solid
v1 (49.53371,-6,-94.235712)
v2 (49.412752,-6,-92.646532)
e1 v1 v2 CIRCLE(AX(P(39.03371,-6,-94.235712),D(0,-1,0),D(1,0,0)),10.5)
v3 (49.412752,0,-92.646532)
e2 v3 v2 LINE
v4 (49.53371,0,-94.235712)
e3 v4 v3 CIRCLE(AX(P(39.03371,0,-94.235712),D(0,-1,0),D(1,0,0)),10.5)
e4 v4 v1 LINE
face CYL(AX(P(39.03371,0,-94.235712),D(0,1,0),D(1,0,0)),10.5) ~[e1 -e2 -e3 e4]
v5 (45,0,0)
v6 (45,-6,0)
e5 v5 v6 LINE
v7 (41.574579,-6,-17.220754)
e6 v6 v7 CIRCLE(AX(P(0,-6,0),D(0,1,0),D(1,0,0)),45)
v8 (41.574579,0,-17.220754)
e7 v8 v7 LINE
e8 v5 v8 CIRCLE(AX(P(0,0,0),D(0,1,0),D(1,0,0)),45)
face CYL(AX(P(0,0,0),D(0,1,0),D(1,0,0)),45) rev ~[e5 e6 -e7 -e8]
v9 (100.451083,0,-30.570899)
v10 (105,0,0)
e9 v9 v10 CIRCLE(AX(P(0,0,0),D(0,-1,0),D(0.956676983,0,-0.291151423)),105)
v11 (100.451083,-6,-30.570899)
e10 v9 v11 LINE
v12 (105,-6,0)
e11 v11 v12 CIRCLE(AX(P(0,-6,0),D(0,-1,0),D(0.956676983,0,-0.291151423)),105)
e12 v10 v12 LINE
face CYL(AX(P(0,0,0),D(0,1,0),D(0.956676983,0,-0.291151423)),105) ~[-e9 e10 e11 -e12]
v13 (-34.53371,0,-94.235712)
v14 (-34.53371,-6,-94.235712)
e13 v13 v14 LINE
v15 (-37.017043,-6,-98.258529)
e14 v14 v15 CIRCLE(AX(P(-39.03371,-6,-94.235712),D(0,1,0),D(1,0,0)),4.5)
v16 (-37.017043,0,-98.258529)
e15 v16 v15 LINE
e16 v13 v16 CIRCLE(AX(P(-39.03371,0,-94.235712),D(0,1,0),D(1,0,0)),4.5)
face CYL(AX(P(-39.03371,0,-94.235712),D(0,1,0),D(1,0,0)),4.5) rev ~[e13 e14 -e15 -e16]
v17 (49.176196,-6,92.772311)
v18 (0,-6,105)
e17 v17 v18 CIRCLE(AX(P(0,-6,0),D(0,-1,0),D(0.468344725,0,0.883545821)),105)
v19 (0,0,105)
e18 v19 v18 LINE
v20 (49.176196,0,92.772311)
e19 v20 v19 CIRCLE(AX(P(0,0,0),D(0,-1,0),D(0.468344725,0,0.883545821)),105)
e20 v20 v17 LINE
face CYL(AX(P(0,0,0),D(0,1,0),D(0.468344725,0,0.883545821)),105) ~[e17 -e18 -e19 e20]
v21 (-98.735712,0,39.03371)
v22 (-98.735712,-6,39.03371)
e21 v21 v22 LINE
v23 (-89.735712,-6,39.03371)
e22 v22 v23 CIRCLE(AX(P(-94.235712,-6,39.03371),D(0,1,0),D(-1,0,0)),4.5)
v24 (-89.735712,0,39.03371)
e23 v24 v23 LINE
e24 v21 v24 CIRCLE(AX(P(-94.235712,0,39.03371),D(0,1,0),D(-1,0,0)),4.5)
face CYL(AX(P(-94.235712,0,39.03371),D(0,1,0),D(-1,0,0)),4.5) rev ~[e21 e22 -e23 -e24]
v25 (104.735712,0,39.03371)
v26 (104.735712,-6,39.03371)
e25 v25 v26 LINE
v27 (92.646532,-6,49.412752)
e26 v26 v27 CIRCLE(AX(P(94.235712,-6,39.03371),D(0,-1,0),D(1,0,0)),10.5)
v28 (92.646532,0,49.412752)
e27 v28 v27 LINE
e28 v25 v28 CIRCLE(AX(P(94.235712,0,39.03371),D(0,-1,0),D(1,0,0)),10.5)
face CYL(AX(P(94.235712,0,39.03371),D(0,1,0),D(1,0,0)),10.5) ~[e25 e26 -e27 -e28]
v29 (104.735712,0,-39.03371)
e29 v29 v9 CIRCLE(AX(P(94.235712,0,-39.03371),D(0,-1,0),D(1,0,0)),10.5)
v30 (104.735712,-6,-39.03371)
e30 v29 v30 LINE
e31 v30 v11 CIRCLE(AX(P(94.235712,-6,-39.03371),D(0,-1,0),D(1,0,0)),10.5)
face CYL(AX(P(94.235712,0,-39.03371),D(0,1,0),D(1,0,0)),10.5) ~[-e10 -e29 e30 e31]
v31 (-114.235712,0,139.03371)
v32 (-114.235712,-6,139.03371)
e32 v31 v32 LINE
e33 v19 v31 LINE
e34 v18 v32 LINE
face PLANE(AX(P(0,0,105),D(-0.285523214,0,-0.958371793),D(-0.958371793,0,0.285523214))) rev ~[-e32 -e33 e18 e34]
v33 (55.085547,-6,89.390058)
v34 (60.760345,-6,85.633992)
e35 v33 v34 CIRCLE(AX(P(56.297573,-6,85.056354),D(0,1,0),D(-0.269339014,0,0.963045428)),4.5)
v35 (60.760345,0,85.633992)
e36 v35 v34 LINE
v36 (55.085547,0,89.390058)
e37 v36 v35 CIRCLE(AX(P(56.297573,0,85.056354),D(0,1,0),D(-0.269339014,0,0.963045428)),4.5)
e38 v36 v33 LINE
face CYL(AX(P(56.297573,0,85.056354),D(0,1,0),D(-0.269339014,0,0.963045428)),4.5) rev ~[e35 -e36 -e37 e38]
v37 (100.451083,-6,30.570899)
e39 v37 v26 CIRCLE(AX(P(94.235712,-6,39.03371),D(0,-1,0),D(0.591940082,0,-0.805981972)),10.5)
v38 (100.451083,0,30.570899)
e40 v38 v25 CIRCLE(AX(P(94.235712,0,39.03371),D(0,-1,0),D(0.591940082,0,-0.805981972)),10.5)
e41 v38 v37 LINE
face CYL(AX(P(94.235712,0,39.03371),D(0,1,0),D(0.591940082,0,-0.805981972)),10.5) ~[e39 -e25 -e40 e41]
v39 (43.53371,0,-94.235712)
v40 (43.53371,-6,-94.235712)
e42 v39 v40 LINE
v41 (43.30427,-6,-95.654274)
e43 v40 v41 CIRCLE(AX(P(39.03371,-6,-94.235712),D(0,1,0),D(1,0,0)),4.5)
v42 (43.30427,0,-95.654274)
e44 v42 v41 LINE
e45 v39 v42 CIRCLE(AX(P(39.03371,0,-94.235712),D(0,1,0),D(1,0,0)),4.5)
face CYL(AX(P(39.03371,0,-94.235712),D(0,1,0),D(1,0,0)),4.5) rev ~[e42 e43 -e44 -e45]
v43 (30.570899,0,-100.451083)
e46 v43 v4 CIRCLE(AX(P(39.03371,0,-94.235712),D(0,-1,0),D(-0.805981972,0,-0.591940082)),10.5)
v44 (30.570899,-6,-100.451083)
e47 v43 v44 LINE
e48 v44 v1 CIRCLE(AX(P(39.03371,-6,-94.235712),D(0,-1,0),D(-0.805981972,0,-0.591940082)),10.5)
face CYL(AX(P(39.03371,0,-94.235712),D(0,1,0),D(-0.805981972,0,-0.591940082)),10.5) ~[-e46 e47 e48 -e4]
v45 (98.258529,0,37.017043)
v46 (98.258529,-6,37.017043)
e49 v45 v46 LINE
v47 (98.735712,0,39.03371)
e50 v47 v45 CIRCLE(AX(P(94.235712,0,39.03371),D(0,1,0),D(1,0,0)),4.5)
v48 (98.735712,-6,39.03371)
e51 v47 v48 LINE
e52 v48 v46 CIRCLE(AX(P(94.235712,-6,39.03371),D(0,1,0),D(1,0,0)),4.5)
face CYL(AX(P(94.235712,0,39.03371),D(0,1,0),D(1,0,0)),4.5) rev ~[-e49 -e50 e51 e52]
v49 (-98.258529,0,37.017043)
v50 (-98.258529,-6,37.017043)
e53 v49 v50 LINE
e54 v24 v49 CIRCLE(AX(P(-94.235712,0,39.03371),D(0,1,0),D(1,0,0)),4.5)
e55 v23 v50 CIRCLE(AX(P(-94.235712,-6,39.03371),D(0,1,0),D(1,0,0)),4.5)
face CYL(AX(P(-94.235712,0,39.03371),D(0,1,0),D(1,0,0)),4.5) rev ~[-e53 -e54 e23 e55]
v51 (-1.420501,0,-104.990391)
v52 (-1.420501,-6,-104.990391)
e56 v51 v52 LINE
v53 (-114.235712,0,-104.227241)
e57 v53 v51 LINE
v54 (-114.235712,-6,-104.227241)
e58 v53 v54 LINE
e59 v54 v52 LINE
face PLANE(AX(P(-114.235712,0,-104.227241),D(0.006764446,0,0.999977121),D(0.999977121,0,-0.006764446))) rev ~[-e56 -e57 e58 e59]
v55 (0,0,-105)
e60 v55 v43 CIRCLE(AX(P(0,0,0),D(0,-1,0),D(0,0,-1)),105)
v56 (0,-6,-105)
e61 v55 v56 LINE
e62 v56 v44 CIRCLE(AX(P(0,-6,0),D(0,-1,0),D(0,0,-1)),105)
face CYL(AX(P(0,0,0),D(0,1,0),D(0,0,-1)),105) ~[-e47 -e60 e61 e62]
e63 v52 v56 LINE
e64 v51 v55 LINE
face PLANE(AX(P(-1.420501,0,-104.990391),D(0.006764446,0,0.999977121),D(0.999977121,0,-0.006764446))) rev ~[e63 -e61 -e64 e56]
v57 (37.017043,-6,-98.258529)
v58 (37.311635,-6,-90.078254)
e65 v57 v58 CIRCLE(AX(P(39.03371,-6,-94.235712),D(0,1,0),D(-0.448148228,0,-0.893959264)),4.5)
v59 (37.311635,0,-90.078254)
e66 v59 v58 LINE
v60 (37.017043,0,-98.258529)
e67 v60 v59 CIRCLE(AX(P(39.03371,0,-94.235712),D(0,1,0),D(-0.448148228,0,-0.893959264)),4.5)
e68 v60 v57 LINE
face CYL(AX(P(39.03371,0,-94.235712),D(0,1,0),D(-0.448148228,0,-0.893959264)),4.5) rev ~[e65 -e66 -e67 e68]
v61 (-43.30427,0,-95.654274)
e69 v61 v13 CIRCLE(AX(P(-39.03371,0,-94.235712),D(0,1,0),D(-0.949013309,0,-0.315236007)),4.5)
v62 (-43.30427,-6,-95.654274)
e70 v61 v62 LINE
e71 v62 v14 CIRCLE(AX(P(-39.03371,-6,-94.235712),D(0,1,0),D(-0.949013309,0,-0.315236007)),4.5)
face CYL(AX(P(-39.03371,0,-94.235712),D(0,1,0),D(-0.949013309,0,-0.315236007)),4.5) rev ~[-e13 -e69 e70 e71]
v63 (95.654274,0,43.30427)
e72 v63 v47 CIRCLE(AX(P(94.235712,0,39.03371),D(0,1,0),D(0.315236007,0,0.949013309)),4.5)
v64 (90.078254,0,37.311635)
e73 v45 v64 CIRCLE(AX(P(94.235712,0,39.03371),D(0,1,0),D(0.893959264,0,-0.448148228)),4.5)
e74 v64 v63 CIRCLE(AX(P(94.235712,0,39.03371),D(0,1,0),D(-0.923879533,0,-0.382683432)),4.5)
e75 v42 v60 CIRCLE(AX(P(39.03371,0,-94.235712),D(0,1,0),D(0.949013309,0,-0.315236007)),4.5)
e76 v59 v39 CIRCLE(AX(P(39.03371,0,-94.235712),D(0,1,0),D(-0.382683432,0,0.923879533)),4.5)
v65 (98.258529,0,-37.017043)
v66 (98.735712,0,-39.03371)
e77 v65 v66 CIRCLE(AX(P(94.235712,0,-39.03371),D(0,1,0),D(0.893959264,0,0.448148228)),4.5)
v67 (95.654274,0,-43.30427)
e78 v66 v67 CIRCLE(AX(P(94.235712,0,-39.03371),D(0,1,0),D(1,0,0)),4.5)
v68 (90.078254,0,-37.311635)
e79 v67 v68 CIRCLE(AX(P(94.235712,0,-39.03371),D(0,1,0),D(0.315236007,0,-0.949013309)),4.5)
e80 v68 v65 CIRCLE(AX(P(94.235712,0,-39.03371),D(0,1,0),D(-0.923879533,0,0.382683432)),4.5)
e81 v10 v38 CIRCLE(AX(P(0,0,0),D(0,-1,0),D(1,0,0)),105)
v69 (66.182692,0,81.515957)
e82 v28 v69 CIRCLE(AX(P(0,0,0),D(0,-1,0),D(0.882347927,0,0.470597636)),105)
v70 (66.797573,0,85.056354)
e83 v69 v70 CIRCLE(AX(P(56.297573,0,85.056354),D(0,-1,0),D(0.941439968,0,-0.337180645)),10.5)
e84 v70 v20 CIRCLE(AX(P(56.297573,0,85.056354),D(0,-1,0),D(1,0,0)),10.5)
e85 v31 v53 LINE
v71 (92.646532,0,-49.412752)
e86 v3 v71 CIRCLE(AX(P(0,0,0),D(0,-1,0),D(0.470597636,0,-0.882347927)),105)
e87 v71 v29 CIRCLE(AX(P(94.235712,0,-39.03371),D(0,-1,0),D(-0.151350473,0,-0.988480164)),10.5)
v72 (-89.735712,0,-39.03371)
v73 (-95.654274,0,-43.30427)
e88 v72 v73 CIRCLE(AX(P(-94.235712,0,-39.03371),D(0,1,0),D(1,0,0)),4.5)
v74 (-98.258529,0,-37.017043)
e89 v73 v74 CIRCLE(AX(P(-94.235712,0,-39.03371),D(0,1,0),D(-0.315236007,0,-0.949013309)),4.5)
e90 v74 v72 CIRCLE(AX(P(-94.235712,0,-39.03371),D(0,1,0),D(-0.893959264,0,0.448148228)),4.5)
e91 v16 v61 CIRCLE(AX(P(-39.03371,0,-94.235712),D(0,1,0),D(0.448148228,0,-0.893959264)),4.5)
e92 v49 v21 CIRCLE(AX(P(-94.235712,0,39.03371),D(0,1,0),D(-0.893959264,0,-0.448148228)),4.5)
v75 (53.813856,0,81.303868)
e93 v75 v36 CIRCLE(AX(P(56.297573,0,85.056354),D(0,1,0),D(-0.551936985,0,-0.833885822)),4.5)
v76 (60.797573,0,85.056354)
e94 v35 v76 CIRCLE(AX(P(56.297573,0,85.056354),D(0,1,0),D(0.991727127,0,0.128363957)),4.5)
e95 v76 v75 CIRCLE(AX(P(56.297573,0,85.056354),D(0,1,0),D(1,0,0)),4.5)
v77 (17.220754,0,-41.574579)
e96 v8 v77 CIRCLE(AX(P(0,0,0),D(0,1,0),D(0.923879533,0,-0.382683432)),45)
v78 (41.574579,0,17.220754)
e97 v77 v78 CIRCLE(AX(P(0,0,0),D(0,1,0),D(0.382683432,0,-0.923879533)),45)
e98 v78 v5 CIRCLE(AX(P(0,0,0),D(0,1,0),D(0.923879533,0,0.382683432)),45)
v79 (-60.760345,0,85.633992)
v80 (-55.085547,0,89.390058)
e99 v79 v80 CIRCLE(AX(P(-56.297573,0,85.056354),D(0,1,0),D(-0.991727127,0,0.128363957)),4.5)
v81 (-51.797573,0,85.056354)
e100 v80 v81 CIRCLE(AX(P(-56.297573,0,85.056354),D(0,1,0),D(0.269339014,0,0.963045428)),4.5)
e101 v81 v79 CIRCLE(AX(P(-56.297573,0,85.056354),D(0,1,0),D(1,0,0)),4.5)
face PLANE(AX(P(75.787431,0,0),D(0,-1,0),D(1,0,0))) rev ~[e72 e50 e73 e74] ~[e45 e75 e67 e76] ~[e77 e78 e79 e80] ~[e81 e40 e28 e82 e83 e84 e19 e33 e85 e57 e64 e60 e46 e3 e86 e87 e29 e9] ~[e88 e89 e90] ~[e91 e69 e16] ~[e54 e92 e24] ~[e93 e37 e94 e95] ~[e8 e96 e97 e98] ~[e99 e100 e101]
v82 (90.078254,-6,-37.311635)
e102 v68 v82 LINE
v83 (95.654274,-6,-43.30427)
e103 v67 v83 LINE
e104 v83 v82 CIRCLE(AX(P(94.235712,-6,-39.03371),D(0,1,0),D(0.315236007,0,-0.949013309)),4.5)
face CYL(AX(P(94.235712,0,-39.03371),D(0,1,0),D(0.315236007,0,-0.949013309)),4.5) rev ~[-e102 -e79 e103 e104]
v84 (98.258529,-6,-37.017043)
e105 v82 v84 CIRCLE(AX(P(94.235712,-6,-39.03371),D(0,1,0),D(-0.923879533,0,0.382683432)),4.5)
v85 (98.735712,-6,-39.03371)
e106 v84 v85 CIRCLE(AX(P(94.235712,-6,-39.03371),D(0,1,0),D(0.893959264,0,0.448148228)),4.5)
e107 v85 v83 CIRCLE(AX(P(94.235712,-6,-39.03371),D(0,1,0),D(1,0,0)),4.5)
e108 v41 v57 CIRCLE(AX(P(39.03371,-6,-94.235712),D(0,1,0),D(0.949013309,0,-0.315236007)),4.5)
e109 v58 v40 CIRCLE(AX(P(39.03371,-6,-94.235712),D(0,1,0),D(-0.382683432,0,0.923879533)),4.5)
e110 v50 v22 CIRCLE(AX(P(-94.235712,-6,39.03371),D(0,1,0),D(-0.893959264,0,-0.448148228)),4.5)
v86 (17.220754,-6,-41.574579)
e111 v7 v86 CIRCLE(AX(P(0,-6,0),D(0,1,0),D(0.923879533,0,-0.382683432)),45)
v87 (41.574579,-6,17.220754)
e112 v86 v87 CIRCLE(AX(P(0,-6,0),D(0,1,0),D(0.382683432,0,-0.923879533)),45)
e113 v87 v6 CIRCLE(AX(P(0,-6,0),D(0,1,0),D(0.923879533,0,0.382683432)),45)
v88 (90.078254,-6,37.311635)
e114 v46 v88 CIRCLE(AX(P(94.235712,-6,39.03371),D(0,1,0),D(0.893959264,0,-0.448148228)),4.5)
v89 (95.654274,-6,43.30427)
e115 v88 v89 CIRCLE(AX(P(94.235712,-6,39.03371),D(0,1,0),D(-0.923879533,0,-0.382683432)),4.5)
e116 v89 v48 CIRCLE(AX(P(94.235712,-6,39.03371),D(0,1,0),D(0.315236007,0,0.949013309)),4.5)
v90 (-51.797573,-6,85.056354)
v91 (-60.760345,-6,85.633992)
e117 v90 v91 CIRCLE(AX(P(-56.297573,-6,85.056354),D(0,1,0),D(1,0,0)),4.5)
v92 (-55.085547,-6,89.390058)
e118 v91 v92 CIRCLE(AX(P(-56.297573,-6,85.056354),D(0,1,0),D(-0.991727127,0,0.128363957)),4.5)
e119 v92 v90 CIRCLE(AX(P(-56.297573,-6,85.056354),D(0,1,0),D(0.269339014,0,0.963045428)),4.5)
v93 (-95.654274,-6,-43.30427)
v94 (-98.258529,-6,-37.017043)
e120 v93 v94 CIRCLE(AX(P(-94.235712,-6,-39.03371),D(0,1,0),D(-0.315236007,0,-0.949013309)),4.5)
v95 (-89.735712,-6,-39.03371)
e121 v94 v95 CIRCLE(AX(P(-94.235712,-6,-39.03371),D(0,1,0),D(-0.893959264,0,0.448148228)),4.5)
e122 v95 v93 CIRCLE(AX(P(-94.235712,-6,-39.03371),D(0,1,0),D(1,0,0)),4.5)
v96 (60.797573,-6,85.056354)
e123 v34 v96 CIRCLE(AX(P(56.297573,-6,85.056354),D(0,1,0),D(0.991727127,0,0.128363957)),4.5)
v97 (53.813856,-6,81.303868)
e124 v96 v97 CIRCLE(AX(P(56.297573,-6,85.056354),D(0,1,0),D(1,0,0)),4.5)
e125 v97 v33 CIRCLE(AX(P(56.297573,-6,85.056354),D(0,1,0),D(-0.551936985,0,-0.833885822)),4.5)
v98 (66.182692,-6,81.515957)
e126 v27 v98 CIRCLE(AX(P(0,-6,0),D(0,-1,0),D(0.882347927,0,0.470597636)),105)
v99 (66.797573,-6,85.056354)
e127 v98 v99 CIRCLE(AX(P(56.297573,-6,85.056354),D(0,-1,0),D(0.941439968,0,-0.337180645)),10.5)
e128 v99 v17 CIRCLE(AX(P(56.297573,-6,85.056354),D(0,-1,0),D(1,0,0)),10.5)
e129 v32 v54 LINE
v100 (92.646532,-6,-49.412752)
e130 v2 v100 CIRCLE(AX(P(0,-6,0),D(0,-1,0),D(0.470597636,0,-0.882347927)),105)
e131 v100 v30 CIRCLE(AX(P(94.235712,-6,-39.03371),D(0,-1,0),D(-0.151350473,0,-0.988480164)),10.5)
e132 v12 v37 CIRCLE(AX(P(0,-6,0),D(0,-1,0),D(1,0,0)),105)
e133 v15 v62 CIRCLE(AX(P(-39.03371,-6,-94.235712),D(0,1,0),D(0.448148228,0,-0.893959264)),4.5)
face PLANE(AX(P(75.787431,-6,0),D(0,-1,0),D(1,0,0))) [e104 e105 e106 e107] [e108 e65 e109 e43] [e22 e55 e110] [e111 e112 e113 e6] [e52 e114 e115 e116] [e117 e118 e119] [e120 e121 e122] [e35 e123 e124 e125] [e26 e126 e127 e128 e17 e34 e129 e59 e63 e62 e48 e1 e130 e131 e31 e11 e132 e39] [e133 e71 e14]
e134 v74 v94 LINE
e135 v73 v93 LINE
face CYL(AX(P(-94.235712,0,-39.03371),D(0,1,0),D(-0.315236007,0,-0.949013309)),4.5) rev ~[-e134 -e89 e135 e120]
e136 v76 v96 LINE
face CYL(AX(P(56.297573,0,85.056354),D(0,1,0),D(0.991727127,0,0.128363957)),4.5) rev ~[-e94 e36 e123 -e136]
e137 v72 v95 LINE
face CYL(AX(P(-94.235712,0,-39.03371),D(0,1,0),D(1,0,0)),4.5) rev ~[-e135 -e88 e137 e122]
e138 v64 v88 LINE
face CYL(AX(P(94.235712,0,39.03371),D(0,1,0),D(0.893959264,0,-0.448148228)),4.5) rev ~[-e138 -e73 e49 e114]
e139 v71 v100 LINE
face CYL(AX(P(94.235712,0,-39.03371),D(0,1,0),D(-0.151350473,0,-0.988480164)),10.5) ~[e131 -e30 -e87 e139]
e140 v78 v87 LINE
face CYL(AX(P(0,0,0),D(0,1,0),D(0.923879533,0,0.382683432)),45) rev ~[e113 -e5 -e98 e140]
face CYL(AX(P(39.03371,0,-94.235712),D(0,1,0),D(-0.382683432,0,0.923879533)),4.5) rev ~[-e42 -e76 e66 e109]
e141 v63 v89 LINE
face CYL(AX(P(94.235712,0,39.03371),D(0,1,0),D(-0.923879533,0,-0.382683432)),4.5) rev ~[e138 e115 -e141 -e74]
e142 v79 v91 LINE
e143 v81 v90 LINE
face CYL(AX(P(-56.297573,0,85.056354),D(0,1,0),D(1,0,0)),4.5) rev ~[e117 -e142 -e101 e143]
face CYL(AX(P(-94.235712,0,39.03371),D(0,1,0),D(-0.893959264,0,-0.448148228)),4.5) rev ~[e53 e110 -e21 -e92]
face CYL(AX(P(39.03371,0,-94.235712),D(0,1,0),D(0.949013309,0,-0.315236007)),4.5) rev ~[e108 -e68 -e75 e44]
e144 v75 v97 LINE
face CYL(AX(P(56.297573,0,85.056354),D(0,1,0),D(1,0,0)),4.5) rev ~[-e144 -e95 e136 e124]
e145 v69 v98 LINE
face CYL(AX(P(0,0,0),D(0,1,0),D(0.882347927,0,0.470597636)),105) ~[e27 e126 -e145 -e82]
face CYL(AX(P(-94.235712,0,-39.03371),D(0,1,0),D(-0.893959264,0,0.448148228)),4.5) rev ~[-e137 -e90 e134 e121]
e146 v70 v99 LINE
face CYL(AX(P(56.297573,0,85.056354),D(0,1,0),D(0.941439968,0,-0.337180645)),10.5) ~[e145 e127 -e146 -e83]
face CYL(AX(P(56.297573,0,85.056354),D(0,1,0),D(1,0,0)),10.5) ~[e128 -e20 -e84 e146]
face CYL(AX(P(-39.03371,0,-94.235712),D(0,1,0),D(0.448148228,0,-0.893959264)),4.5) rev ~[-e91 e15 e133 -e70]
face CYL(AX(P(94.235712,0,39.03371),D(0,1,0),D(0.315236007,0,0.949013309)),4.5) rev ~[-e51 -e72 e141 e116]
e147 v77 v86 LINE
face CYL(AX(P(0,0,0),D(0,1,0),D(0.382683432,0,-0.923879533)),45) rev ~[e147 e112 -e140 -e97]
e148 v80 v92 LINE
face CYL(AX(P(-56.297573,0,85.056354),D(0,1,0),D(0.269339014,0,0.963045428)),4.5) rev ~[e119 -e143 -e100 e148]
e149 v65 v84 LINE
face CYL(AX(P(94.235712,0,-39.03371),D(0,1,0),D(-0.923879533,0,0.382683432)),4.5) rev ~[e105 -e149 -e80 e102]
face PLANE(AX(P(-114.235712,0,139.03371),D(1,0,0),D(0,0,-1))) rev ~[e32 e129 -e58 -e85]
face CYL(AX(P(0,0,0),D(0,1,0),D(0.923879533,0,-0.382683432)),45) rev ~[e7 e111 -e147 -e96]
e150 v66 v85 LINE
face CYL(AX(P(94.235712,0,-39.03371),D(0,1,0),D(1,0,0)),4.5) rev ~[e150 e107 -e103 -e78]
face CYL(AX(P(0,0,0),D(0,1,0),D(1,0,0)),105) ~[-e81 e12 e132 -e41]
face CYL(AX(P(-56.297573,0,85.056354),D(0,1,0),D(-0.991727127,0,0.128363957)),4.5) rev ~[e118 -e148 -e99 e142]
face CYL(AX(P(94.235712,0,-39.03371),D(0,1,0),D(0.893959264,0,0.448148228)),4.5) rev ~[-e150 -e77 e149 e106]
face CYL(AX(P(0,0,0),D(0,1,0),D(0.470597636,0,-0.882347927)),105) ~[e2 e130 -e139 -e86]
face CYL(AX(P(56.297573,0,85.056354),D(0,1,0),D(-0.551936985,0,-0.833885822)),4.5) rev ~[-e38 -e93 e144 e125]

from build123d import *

# Parameters (mm, degrees)
F1_DEPTH = 6


with BuildPart() as f1:
    # F0 (on Front) → F1 (new body)
    with BuildSketch(Plane.XZ):
        with BuildLine():
            ThreePointArc((100.4510831721, -30.5708993907), (103.8565446495, -15.4537417302), (105, 0))
            ThreePointArc((105, 0), (103.8565446495, 15.4537417302), (100.4510831721, 30.5708993907))
            ThreePointArc((100.4510831721, 30.5708993907), (91.4115955865, 28.9206312082), (84.5349772248, 35.0155340614))
            Line((84.5349772248, 35.0155340614), (41.574578963, 17.2207544564))
            ThreePointArc((41.574578963, 17.2207544564), (44.1353376181, 8.7790644907), (45, 0))
            ThreePointArc((45, 0), (44.1353376181, -8.7790644907), (41.574578963, -17.2207544564))
            Line((41.574578963, -17.2207544564), (84.5349772248, -35.0155340614))
            ThreePointArc((84.5349772248, -35.0155340614), (91.4115955865, -28.9206312082), (100.4510831721, -30.5708993907))
        make_face()
        with BuildLine():
            ThreePointArc((84.5349772248, 35.0155340614), (91.4115955865, 28.9206312082), (100.4510831721, 30.5708993907))
            ThreePointArc((100.4510831721, 30.5708993907), (99.407070598, 33.8117481819), (98.2585290039, 37.0170430746))
            ThreePointArc((98.2585290039, 37.0170430746), (94.0737613555, 34.5366252803), (90.0782544199, 37.3116346556))
            Line((90.0782544199, 37.3116346556), (84.5349772248, 35.0155340614))
        make_face()
        with BuildLine():
            ThreePointArc((98.2585290039, 37.0170430746), (99.407070598, 33.8117481819), (100.4510831721, 30.5708993907))
            ThreePointArc((100.4510831721, 30.5708993907), (103.6035133918, 34.2908941649), (104.7357123162, 39.0337101012))
            ThreePointArc((104.7357123162, 39.0337101012), (101.075434913, 47.0004029407), (92.6465323546, 49.4127518224))
            ThreePointArc((92.6465323546, 49.4127518224), (94.199930141, 46.3828972946), (95.6542743456, 43.3042699906))
            ThreePointArc((95.6542743456, 43.3042699906), (97.8849265557, 41.6668138656), (98.7357123162, 39.0337101012))
            ThreePointArc((98.7357123162, 39.0337101012), (98.6147918481, 37.997533257), (98.2585290039, 37.0170430746))
        make_face()
        with BuildLine():
            ThreePointArc((104.7357123162, -39.0337101012), (103.6035133918, -34.2908941649), (100.4510831721, -30.5708993907))
            ThreePointArc((100.4510831721, -30.5708993907), (99.407070598, -33.8117481819), (98.2585290039, -37.0170430746))
            ThreePointArc((98.2585290039, -37.0170430746), (98.6147918481, -37.997533257), (98.7357123162, -39.0337101012))
            ThreePointArc((98.7357123162, -39.0337101012), (97.8849265557, -41.6668138656), (95.6542743456, -43.3042699906))
            ThreePointArc((95.6542743456, -43.3042699906), (94.199930141, -46.3828972946), (92.6465323546, -49.4127518224))
            ThreePointArc((92.6465323546, -49.4127518224), (101.075434913, -47.0004029407), (104.7357123162, -39.0337101012))
        make_face()
        with BuildLine():
            ThreePointArc((98.2585290039, -37.0170430746), (99.407070598, -33.8117481819), (100.4510831721, -30.5708993907))
            ThreePointArc((100.4510831721, -30.5708993907), (91.4115955865, -28.9206312082), (84.5349772248, -35.0155340614))
            Line((84.5349772248, -35.0155340614), (90.0782544199, -37.3116346556))
            ThreePointArc((90.0782544199, -37.3116346556), (94.0737613555, -34.5366252803), (98.2585290039, -37.0170430746))
        make_face()
        with BuildLine():
            ThreePointArc((92.6465323546, 49.4127518224), (85.0877335618, 44.1877846748), (84.5349772248, 35.0155340614))
            Line((84.5349772248, 35.0155340614), (90.0782544199, 37.3116346556))
            ThreePointArc((90.0782544199, 37.3116346556), (90.9412765212, 42.0991126512), (95.6542743456, 43.3042699906))
            ThreePointArc((95.6542743456, 43.3042699906), (94.199930141, 46.3828972946), (92.6465323546, 49.4127518224))
        make_face()
        with BuildLine():
            Line((41.574578963, 17.2207544564), (84.5349772248, 35.0155340614))
            ThreePointArc((84.5349772248, 35.0155340614), (85.0877335618, 44.1877846748), (92.6465323546, 49.4127518224))
            ThreePointArc((92.6465323546, 49.4127518224), (81.0205812557, 66.7882131292), (66.1826921615, 81.5159570774))
            ThreePointArc((66.1826921615, 81.5159570774), (59.6114355729, 75.0930054405), (50.5022341561, 76.3005527191))
            Line((50.5022341561, 76.3005527191), (24.837164339, 37.524861993))
            ThreePointArc((24.837164339, 37.524861993), (34.7231062524, 28.6235199125), (41.574578963, 17.2207544564))
        make_face()
        with BuildLine():
            ThreePointArc((92.6465323546, -49.4127518224), (85.0877335618, -44.1877846748), (84.5349772248, -35.0155340614))
            Line((84.5349772248, -35.0155340614), (41.574578963, -17.2207544564))
            ThreePointArc((41.574578963, -17.2207544564), (31.8198051534, -31.8198051534), (17.2207544564, -41.574578963))
            Line((17.2207544564, -41.574578963), (35.0155340614, -84.5349772248))
            ThreePointArc((35.0155340614, -84.5349772248), (44.1877846748, -85.0877335618), (49.4127518224, -92.6465323546))
            ThreePointArc((49.4127518224, -92.6465323546), (74.2462120246, -74.2462120246), (92.6465323546, -49.4127518224))
        make_face()
        with BuildLine():
            Line((90.0782544199, -37.3116346556), (84.5349772248, -35.0155340614))
            ThreePointArc((84.5349772248, -35.0155340614), (85.0877335618, -44.1877846748), (92.6465323546, -49.4127518224))
            ThreePointArc((92.6465323546, -49.4127518224), (94.199930141, -46.3828972946), (95.6542743456, -43.3042699906))
            ThreePointArc((95.6542743456, -43.3042699906), (90.9412765212, -42.0991126512), (90.0782544199, -37.3116346556))
        make_face()
        with BuildLine():
            ThreePointArc((17.2207544564, -41.574578963), (-44.7928289265, 4.3130588634), (24.837164339, 37.524861993))
            Line((24.837164339, 37.524861993), (50.5022341561, 76.3005527191))
            ThreePointArc((50.5022341561, 76.3005527191), (45.831432476, 84.2137905236), (49.1761961289, 92.772311248))
            ThreePointArc((49.1761961289, 92.772311248), (25.3368044449, 101.8972342143), (0, 105))
            ThreePointArc((0, 105), (-25.3368044449, 101.8972342143), (-49.1761961289, 92.772311248))
            ThreePointArc((-49.1761961289, 92.772311248), (-46.6792448947, 89.2679775332), (-45.7975725018, 85.0563538509))
            ThreePointArc((-45.7975725018, 85.0563538509), (-54.5008750352, 74.7112159488), (-66.1826921615, 81.5159570774))
            ThreePointArc((-66.1826921615, 81.5159570774), (-81.0205812557, 66.7882131292), (-92.6465323546, 49.4127518224))
            ThreePointArc((-92.6465323546, 49.4127518224), (-86.2690194767, 45.8734326981), (-83.7357123162, 39.0337101012))
            ThreePointArc((-83.7357123162, 39.0337101012), (-89.4928963798, 29.6659090256), (-100.4510831721, 30.5708993907))
            ThreePointArc((-100.4510831721, 30.5708993907), (-105, 0), (-100.4510831721, -30.5708993907))
            ThreePointArc((-100.4510831721, -30.5708993907), (-89.4928963798, -29.6659090255), (-83.7357123162, -39.0337101012))
            ThreePointArc((-83.7357123162, -39.0337101012), (-86.2690194767, -45.8734326981), (-92.6465323546, -49.4127518224))
            ThreePointArc((-92.6465323546, -49.4127518224), (-74.2462120246, -74.2462120246), (-49.4127518224, -92.6465323546))
            ThreePointArc((-49.4127518224, -92.6465323546), (-38.2368218005, -83.7659955561), (-28.5337101012, -94.2357123162))
            ThreePointArc((-28.5337101012, -94.2357123162), (-29.0559971253, -97.506070671), (-30.5708993907, -100.4510831721))
            ThreePointArc((-30.5708993907, -100.4510831721), (-16.1559201029, -103.7496325084), (-1.4205010638, -104.9903908781))
            Line((-1.4205010638, -104.9903908781), (0, -105))
            ThreePointArc((0, -105), (15.4537417302, -103.8565446495), (30.5708993907, -100.4510831721))
            ThreePointArc((30.5708993907, -100.4510831721), (28.9206312082, -91.4115955865), (35.0155340614, -84.5349772248))
            Line((35.0155340614, -84.5349772248), (17.2207544564, -41.574578963))
        make_face()
        with BuildLine():
            ThreePointArc((50.5022341561, 76.3005527191), (59.6114355729, 75.0930054405), (66.1826921615, 81.5159570774))
            ThreePointArc((66.1826921615, 81.5159570774), (63.5049068662, 83.6189380698), (60.7603445735, 85.6339916582))
            ThreePointArc((60.7603445735, 85.6339916582), (60.7882558754, 85.3457719546), (60.7975725018, 85.0563538509))
            ThreePointArc((60.7975725018, 85.0563538509), (58.4275110042, 81.0923455289), (53.8138560679, 81.3038676515))
            Line((53.8138560679, 81.3038676515), (50.5022341561, 76.3005527191))
        make_face()
        with BuildLine():
            ThreePointArc((60.7603445735, 85.6339916582), (63.5049068662, 83.6189380698), (66.1826921615, 81.5159570774))
            ThreePointArc((66.1826921615, 81.5159570774), (66.6427104039, 83.2596563842), (66.7975725018, 85.0563538509))
            ThreePointArc((66.7975725018, 85.0563538509), (60.5091961842, 94.674681458), (49.1761961289, 92.772311248))
            ThreePointArc((49.1761961289, 92.772311248), (52.1582944094, 91.1290970234), (55.0855469393, 89.390058275))
            ThreePointArc((55.0855469393, 89.390058275), (58.7812889357, 88.8088400502), (60.7603445735, 85.6339916582))
        make_face()
        with BuildLine():
            ThreePointArc((49.5337101012, -94.2357123162), (49.5034268613, -93.4388240154), (49.4127518224, -92.6465323546))
            ThreePointArc((49.4127518224, -92.6465323546), (46.3828972946, -94.199930141), (43.3042699906, -95.6542743456))
            ThreePointArc((43.3042699906, -95.6542743456), (40.7557855469, -98.3931702125), (37.0170430746, -98.2585290039))
            ThreePointArc((37.0170430746, -98.2585290039), (33.8117481819, -99.407070598), (30.5708993907, -100.4510831721))
            ThreePointArc((30.5708993907, -100.4510831721), (42.3040684561, -104.2134252921), (49.5337101012, -94.2357123162))
        make_face()
        with BuildLine():
            ThreePointArc((43.3042699906, -95.6542743456), (46.3828972946, -94.199930141), (49.4127518224, -92.6465323546))
            ThreePointArc((49.4127518224, -92.6465323546), (44.1877846748, -85.0877335618), (35.0155340614, -84.5349772248))
            Line((35.0155340614, -84.5349772248), (37.3116346556, -90.0782544199))
            ThreePointArc((37.3116346556, -90.0782544199), (41.5337761498, -90.4940990608), (43.5337101012, -94.2357123162))
            ThreePointArc((43.5337101012, -94.2357123162), (43.4759797634, -94.9542109236), (43.3042699906, -95.6542743456))
        make_face()
        with BuildLine():
            ThreePointArc((49.1761961289, 92.772311248), (45.831432476, 84.2137905236), (50.5022341561, 76.3005527191))
            Line((50.5022341561, 76.3005527191), (53.8138560679, 81.3038676515))
            ThreePointArc((53.8138560679, 81.3038676515), (51.8522100953, 85.7554626223), (55.0855469393, 89.390058275))
            ThreePointArc((55.0855469393, 89.390058275), (52.1582944094, 91.1290970234), (49.1761961289, 92.772311248))
        make_face()
        with BuildLine():
            Line((37.3116346556, -90.0782544199), (35.0155340614, -84.5349772248))
            ThreePointArc((35.0155340614, -84.5349772248), (28.9206312082, -91.4115955865), (30.5708993907, -100.4510831721))
            ThreePointArc((30.5708993907, -100.4510831721), (33.8117481819, -99.407070598), (37.0170430746, -98.2585290039))
            ThreePointArc((37.0170430746, -98.2585290039), (34.5366252803, -94.0737613555), (37.3116346556, -90.0782544199))
        make_face()
        with BuildLine():
            ThreePointArc((-49.1761961289, 92.772311248), (-25.3368044449, 101.8972342143), (0, 105))
            Line((0, 105), (-114.2357123162, 139.0337101012))
            Line((-114.2357123162, 139.0337101012), (-114.2357123162, 39.0337101012))
            Line((-114.2357123162, 39.0337101012), (-104.7357123162, 39.0337101012))
            ThreePointArc((-104.7357123162, 39.0337101012), (-101.075434913, 47.0004029407), (-92.6465323546, 49.4127518224))
            ThreePointArc((-92.6465323546, 49.4127518224), (-81.0205812557, 66.7882131292), (-66.1826921615, 81.5159570774))
            ThreePointArc((-66.1826921615, 81.5159570774), (-62.0929108476, 93.8121549826), (-49.1761961289, 92.772311248))
        make_face()
        with BuildLine():
            ThreePointArc((-45.7975725018, 85.0563538509), (-46.6792448947, 89.2679775332), (-49.1761961289, 92.772311248))
            ThreePointArc((-49.1761961289, 92.772311248), (-52.1582944094, 91.1290970234), (-55.0855469393, 89.390058275))
            ThreePointArc((-55.0855469393, 89.390058275), (-52.7125958609, 87.7762697474), (-51.7975725018, 85.0563538509))
            ThreePointArc((-51.7975725018, 85.0563538509), (-56.5869906056, 80.5656704773), (-60.7603445735, 85.6339916582))
            ThreePointArc((-60.7603445735, 85.6339916582), (-63.5049068662, 83.6189380698), (-66.1826921615, 81.5159570774))
            ThreePointArc((-66.1826921615, 81.5159570774), (-54.5008750352, 74.7112159488), (-45.7975725018, 85.0563538509))
        make_face()
        with BuildLine():
            ThreePointArc((-55.0855469393, 89.390058275), (-52.1582944094, 91.1290970234), (-49.1761961289, 92.772311248))
            ThreePointArc((-49.1761961289, 92.772311248), (-62.0929108476, 93.8121549826), (-66.1826921615, 81.5159570774))
            ThreePointArc((-66.1826921615, 81.5159570774), (-63.5049068662, 83.6189380698), (-60.7603445735, 85.6339916582))
            ThreePointArc((-60.7603445735, 85.6339916582), (-58.7812889357, 88.8088400502), (-55.0855469393, 89.390058275))
        make_face()
        with BuildLine():
            Line((-39.1047365684, -104.7354720868), (-1.4205010638, -104.9903908781))
            ThreePointArc((-1.4205010638, -104.9903908781), (-16.1559201029, -103.7496325084), (-30.5708993907, -100.4510831721))
            ThreePointArc((-30.5708993907, -100.4510831721), (-34.3226053699, -103.6195011144), (-39.1047365684, -104.7354720868))
        make_face()
        with BuildLine():
            Line((-104.7357123162, 39.0337101012), (-114.2357123162, 39.0337101012))
            Line((-114.2357123162, 39.0337101012), (-114.2357123162, -104.2272410647))
            Line((-114.2357123162, -104.2272410647), (-39.1047365684, -104.7354720868))
            ThreePointArc((-39.1047365684, -104.7354720868), (-47.0234909022, -101.0484505874), (-49.4127518224, -92.6465323546))
            ThreePointArc((-49.4127518224, -92.6465323546), (-74.2462120246, -74.2462120246), (-92.6465323546, -49.4127518224))
            ThreePointArc((-92.6465323546, -49.4127518224), (-103.9364474075, -43.0518861411), (-100.4510831721, -30.5708993907))
            ThreePointArc((-100.4510831721, -30.5708993907), (-105, 0), (-100.4510831721, 30.5708993907))
            ThreePointArc((-100.4510831721, 30.5708993907), (-103.6035133918, 34.2908941649), (-104.7357123162, 39.0337101012))
        make_face()
        with BuildLine():
            ThreePointArc((-39.1047365684, -104.7354720868), (-34.3226053699, -103.6195011144), (-30.5708993907, -100.4510831721))
            ThreePointArc((-30.5708993907, -100.4510831721), (-33.8117481819, -99.407070598), (-37.0170430746, -98.2585290039))
            ThreePointArc((-37.0170430746, -98.2585290039), (-40.7557855469, -98.3931702125), (-43.3042699906, -95.6542743456))
            ThreePointArc((-43.3042699906, -95.6542743456), (-46.3828972946, -94.199930141), (-49.4127518224, -92.6465323546))
            ThreePointArc((-49.4127518224, -92.6465323546), (-47.0234909022, -101.0484505874), (-39.1047365684, -104.7354720868))
        make_face()
        with BuildLine():
            ThreePointArc((-37.0170430746, -98.2585290039), (-33.8117481819, -99.407070598), (-30.5708993907, -100.4510831721))
            ThreePointArc((-30.5708993907, -100.4510831721), (-29.0559971253, -97.506070671), (-28.5337101012, -94.2357123162))
            ThreePointArc((-28.5337101012, -94.2357123162), (-38.2368218005, -83.7659955561), (-49.4127518224, -92.6465323546))
            ThreePointArc((-49.4127518224, -92.6465323546), (-46.3828972946, -94.199930141), (-43.3042699906, -95.6542743456))
            ThreePointArc((-43.3042699906, -95.6542743456), (-39.7522087087, -89.793442654), (-34.5337101012, -94.2357123162))
            ThreePointArc((-34.5337101012, -94.2357123162), (-35.2045455958, -96.5995014755), (-37.0170430746, -98.2585290039))
        make_face()
        with BuildLine():
            ThreePointArc((-83.7357123162, 39.0337101012), (-86.2690194767, 45.8734326981), (-92.6465323546, 49.4127518224))
            ThreePointArc((-92.6465323546, 49.4127518224), (-94.199930141, 46.3828972946), (-95.6542743456, 43.3042699906))
            ThreePointArc((-95.6542743456, 43.3042699906), (-91.6026085518, 42.6829243408), (-89.7357123162, 39.0337101012))
            ThreePointArc((-89.7357123162, 39.0337101012), (-93.1995354719, 34.6546305692), (-98.2585290039, 37.0170430746))
            ThreePointArc((-98.2585290039, 37.0170430746), (-99.407070598, 33.8117481819), (-100.4510831721, 30.5708993907))
            ThreePointArc((-100.4510831721, 30.5708993907), (-89.4928963798, 29.6659090256), (-83.7357123162, 39.0337101012))
        make_face()
        with BuildLine():
            ThreePointArc((-95.6542743456, 43.3042699906), (-94.199930141, 46.3828972946), (-92.6465323546, 49.4127518224))
            ThreePointArc((-92.6465323546, 49.4127518224), (-101.075434913, 47.0004029407), (-104.7357123162, 39.0337101012))
            Line((-104.7357123162, 39.0337101012), (-98.7357123162, 39.0337101012))
            ThreePointArc((-98.7357123162, 39.0337101012), (-97.8849265557, 41.6668138656), (-95.6542743456, 43.3042699906))
        make_face()
        with BuildLine():
            Line((-98.7357123162, 39.0337101012), (-104.7357123162, 39.0337101012))
            ThreePointArc((-104.7357123162, 39.0337101012), (-103.6035133918, 34.2908941649), (-100.4510831721, 30.5708993907))
            ThreePointArc((-100.4510831721, 30.5708993907), (-99.407070598, 33.8117481819), (-98.2585290039, 37.0170430746))
            ThreePointArc((-98.2585290039, 37.0170430746), (-98.6147918481, 37.997533257), (-98.7357123162, 39.0337101012))
        make_face()
        with BuildLine():
            ThreePointArc((-100.4510831721, -30.5708993907), (-103.9364474075, -43.0518861411), (-92.6465323546, -49.4127518224))
            ThreePointArc((-92.6465323546, -49.4127518224), (-94.199930141, -46.3828972946), (-95.6542743456, -43.3042699906))
            ThreePointArc((-95.6542743456, -43.3042699906), (-98.3931702125, -40.7557855469), (-98.2585290039, -37.0170430746))
            ThreePointArc((-98.2585290039, -37.0170430746), (-99.407070598, -33.8117481819), (-100.4510831721, -30.5708993907))
        make_face()
        with BuildLine():
            ThreePointArc((-95.6542743456, -43.3042699906), (-94.199930141, -46.3828972946), (-92.6465323546, -49.4127518224))
            ThreePointArc((-92.6465323546, -49.4127518224), (-86.2690194767, -45.8734326981), (-83.7357123162, -39.0337101012))
            ThreePointArc((-83.7357123162, -39.0337101012), (-89.4928963798, -29.6659090255), (-100.4510831721, -30.5708993907))
            ThreePointArc((-100.4510831721, -30.5708993907), (-99.407070598, -33.8117481819), (-98.2585290039, -37.0170430746))
            ThreePointArc((-98.2585290039, -37.0170430746), (-93.1995354719, -34.6546305692), (-89.7357123162, -39.0337101012))
            ThreePointArc((-89.7357123162, -39.0337101012), (-91.6026085518, -42.6829243408), (-95.6542743456, -43.3042699906))
        make_face()
    extrude(amount=F1_DEPTH)


solid = f1.part
